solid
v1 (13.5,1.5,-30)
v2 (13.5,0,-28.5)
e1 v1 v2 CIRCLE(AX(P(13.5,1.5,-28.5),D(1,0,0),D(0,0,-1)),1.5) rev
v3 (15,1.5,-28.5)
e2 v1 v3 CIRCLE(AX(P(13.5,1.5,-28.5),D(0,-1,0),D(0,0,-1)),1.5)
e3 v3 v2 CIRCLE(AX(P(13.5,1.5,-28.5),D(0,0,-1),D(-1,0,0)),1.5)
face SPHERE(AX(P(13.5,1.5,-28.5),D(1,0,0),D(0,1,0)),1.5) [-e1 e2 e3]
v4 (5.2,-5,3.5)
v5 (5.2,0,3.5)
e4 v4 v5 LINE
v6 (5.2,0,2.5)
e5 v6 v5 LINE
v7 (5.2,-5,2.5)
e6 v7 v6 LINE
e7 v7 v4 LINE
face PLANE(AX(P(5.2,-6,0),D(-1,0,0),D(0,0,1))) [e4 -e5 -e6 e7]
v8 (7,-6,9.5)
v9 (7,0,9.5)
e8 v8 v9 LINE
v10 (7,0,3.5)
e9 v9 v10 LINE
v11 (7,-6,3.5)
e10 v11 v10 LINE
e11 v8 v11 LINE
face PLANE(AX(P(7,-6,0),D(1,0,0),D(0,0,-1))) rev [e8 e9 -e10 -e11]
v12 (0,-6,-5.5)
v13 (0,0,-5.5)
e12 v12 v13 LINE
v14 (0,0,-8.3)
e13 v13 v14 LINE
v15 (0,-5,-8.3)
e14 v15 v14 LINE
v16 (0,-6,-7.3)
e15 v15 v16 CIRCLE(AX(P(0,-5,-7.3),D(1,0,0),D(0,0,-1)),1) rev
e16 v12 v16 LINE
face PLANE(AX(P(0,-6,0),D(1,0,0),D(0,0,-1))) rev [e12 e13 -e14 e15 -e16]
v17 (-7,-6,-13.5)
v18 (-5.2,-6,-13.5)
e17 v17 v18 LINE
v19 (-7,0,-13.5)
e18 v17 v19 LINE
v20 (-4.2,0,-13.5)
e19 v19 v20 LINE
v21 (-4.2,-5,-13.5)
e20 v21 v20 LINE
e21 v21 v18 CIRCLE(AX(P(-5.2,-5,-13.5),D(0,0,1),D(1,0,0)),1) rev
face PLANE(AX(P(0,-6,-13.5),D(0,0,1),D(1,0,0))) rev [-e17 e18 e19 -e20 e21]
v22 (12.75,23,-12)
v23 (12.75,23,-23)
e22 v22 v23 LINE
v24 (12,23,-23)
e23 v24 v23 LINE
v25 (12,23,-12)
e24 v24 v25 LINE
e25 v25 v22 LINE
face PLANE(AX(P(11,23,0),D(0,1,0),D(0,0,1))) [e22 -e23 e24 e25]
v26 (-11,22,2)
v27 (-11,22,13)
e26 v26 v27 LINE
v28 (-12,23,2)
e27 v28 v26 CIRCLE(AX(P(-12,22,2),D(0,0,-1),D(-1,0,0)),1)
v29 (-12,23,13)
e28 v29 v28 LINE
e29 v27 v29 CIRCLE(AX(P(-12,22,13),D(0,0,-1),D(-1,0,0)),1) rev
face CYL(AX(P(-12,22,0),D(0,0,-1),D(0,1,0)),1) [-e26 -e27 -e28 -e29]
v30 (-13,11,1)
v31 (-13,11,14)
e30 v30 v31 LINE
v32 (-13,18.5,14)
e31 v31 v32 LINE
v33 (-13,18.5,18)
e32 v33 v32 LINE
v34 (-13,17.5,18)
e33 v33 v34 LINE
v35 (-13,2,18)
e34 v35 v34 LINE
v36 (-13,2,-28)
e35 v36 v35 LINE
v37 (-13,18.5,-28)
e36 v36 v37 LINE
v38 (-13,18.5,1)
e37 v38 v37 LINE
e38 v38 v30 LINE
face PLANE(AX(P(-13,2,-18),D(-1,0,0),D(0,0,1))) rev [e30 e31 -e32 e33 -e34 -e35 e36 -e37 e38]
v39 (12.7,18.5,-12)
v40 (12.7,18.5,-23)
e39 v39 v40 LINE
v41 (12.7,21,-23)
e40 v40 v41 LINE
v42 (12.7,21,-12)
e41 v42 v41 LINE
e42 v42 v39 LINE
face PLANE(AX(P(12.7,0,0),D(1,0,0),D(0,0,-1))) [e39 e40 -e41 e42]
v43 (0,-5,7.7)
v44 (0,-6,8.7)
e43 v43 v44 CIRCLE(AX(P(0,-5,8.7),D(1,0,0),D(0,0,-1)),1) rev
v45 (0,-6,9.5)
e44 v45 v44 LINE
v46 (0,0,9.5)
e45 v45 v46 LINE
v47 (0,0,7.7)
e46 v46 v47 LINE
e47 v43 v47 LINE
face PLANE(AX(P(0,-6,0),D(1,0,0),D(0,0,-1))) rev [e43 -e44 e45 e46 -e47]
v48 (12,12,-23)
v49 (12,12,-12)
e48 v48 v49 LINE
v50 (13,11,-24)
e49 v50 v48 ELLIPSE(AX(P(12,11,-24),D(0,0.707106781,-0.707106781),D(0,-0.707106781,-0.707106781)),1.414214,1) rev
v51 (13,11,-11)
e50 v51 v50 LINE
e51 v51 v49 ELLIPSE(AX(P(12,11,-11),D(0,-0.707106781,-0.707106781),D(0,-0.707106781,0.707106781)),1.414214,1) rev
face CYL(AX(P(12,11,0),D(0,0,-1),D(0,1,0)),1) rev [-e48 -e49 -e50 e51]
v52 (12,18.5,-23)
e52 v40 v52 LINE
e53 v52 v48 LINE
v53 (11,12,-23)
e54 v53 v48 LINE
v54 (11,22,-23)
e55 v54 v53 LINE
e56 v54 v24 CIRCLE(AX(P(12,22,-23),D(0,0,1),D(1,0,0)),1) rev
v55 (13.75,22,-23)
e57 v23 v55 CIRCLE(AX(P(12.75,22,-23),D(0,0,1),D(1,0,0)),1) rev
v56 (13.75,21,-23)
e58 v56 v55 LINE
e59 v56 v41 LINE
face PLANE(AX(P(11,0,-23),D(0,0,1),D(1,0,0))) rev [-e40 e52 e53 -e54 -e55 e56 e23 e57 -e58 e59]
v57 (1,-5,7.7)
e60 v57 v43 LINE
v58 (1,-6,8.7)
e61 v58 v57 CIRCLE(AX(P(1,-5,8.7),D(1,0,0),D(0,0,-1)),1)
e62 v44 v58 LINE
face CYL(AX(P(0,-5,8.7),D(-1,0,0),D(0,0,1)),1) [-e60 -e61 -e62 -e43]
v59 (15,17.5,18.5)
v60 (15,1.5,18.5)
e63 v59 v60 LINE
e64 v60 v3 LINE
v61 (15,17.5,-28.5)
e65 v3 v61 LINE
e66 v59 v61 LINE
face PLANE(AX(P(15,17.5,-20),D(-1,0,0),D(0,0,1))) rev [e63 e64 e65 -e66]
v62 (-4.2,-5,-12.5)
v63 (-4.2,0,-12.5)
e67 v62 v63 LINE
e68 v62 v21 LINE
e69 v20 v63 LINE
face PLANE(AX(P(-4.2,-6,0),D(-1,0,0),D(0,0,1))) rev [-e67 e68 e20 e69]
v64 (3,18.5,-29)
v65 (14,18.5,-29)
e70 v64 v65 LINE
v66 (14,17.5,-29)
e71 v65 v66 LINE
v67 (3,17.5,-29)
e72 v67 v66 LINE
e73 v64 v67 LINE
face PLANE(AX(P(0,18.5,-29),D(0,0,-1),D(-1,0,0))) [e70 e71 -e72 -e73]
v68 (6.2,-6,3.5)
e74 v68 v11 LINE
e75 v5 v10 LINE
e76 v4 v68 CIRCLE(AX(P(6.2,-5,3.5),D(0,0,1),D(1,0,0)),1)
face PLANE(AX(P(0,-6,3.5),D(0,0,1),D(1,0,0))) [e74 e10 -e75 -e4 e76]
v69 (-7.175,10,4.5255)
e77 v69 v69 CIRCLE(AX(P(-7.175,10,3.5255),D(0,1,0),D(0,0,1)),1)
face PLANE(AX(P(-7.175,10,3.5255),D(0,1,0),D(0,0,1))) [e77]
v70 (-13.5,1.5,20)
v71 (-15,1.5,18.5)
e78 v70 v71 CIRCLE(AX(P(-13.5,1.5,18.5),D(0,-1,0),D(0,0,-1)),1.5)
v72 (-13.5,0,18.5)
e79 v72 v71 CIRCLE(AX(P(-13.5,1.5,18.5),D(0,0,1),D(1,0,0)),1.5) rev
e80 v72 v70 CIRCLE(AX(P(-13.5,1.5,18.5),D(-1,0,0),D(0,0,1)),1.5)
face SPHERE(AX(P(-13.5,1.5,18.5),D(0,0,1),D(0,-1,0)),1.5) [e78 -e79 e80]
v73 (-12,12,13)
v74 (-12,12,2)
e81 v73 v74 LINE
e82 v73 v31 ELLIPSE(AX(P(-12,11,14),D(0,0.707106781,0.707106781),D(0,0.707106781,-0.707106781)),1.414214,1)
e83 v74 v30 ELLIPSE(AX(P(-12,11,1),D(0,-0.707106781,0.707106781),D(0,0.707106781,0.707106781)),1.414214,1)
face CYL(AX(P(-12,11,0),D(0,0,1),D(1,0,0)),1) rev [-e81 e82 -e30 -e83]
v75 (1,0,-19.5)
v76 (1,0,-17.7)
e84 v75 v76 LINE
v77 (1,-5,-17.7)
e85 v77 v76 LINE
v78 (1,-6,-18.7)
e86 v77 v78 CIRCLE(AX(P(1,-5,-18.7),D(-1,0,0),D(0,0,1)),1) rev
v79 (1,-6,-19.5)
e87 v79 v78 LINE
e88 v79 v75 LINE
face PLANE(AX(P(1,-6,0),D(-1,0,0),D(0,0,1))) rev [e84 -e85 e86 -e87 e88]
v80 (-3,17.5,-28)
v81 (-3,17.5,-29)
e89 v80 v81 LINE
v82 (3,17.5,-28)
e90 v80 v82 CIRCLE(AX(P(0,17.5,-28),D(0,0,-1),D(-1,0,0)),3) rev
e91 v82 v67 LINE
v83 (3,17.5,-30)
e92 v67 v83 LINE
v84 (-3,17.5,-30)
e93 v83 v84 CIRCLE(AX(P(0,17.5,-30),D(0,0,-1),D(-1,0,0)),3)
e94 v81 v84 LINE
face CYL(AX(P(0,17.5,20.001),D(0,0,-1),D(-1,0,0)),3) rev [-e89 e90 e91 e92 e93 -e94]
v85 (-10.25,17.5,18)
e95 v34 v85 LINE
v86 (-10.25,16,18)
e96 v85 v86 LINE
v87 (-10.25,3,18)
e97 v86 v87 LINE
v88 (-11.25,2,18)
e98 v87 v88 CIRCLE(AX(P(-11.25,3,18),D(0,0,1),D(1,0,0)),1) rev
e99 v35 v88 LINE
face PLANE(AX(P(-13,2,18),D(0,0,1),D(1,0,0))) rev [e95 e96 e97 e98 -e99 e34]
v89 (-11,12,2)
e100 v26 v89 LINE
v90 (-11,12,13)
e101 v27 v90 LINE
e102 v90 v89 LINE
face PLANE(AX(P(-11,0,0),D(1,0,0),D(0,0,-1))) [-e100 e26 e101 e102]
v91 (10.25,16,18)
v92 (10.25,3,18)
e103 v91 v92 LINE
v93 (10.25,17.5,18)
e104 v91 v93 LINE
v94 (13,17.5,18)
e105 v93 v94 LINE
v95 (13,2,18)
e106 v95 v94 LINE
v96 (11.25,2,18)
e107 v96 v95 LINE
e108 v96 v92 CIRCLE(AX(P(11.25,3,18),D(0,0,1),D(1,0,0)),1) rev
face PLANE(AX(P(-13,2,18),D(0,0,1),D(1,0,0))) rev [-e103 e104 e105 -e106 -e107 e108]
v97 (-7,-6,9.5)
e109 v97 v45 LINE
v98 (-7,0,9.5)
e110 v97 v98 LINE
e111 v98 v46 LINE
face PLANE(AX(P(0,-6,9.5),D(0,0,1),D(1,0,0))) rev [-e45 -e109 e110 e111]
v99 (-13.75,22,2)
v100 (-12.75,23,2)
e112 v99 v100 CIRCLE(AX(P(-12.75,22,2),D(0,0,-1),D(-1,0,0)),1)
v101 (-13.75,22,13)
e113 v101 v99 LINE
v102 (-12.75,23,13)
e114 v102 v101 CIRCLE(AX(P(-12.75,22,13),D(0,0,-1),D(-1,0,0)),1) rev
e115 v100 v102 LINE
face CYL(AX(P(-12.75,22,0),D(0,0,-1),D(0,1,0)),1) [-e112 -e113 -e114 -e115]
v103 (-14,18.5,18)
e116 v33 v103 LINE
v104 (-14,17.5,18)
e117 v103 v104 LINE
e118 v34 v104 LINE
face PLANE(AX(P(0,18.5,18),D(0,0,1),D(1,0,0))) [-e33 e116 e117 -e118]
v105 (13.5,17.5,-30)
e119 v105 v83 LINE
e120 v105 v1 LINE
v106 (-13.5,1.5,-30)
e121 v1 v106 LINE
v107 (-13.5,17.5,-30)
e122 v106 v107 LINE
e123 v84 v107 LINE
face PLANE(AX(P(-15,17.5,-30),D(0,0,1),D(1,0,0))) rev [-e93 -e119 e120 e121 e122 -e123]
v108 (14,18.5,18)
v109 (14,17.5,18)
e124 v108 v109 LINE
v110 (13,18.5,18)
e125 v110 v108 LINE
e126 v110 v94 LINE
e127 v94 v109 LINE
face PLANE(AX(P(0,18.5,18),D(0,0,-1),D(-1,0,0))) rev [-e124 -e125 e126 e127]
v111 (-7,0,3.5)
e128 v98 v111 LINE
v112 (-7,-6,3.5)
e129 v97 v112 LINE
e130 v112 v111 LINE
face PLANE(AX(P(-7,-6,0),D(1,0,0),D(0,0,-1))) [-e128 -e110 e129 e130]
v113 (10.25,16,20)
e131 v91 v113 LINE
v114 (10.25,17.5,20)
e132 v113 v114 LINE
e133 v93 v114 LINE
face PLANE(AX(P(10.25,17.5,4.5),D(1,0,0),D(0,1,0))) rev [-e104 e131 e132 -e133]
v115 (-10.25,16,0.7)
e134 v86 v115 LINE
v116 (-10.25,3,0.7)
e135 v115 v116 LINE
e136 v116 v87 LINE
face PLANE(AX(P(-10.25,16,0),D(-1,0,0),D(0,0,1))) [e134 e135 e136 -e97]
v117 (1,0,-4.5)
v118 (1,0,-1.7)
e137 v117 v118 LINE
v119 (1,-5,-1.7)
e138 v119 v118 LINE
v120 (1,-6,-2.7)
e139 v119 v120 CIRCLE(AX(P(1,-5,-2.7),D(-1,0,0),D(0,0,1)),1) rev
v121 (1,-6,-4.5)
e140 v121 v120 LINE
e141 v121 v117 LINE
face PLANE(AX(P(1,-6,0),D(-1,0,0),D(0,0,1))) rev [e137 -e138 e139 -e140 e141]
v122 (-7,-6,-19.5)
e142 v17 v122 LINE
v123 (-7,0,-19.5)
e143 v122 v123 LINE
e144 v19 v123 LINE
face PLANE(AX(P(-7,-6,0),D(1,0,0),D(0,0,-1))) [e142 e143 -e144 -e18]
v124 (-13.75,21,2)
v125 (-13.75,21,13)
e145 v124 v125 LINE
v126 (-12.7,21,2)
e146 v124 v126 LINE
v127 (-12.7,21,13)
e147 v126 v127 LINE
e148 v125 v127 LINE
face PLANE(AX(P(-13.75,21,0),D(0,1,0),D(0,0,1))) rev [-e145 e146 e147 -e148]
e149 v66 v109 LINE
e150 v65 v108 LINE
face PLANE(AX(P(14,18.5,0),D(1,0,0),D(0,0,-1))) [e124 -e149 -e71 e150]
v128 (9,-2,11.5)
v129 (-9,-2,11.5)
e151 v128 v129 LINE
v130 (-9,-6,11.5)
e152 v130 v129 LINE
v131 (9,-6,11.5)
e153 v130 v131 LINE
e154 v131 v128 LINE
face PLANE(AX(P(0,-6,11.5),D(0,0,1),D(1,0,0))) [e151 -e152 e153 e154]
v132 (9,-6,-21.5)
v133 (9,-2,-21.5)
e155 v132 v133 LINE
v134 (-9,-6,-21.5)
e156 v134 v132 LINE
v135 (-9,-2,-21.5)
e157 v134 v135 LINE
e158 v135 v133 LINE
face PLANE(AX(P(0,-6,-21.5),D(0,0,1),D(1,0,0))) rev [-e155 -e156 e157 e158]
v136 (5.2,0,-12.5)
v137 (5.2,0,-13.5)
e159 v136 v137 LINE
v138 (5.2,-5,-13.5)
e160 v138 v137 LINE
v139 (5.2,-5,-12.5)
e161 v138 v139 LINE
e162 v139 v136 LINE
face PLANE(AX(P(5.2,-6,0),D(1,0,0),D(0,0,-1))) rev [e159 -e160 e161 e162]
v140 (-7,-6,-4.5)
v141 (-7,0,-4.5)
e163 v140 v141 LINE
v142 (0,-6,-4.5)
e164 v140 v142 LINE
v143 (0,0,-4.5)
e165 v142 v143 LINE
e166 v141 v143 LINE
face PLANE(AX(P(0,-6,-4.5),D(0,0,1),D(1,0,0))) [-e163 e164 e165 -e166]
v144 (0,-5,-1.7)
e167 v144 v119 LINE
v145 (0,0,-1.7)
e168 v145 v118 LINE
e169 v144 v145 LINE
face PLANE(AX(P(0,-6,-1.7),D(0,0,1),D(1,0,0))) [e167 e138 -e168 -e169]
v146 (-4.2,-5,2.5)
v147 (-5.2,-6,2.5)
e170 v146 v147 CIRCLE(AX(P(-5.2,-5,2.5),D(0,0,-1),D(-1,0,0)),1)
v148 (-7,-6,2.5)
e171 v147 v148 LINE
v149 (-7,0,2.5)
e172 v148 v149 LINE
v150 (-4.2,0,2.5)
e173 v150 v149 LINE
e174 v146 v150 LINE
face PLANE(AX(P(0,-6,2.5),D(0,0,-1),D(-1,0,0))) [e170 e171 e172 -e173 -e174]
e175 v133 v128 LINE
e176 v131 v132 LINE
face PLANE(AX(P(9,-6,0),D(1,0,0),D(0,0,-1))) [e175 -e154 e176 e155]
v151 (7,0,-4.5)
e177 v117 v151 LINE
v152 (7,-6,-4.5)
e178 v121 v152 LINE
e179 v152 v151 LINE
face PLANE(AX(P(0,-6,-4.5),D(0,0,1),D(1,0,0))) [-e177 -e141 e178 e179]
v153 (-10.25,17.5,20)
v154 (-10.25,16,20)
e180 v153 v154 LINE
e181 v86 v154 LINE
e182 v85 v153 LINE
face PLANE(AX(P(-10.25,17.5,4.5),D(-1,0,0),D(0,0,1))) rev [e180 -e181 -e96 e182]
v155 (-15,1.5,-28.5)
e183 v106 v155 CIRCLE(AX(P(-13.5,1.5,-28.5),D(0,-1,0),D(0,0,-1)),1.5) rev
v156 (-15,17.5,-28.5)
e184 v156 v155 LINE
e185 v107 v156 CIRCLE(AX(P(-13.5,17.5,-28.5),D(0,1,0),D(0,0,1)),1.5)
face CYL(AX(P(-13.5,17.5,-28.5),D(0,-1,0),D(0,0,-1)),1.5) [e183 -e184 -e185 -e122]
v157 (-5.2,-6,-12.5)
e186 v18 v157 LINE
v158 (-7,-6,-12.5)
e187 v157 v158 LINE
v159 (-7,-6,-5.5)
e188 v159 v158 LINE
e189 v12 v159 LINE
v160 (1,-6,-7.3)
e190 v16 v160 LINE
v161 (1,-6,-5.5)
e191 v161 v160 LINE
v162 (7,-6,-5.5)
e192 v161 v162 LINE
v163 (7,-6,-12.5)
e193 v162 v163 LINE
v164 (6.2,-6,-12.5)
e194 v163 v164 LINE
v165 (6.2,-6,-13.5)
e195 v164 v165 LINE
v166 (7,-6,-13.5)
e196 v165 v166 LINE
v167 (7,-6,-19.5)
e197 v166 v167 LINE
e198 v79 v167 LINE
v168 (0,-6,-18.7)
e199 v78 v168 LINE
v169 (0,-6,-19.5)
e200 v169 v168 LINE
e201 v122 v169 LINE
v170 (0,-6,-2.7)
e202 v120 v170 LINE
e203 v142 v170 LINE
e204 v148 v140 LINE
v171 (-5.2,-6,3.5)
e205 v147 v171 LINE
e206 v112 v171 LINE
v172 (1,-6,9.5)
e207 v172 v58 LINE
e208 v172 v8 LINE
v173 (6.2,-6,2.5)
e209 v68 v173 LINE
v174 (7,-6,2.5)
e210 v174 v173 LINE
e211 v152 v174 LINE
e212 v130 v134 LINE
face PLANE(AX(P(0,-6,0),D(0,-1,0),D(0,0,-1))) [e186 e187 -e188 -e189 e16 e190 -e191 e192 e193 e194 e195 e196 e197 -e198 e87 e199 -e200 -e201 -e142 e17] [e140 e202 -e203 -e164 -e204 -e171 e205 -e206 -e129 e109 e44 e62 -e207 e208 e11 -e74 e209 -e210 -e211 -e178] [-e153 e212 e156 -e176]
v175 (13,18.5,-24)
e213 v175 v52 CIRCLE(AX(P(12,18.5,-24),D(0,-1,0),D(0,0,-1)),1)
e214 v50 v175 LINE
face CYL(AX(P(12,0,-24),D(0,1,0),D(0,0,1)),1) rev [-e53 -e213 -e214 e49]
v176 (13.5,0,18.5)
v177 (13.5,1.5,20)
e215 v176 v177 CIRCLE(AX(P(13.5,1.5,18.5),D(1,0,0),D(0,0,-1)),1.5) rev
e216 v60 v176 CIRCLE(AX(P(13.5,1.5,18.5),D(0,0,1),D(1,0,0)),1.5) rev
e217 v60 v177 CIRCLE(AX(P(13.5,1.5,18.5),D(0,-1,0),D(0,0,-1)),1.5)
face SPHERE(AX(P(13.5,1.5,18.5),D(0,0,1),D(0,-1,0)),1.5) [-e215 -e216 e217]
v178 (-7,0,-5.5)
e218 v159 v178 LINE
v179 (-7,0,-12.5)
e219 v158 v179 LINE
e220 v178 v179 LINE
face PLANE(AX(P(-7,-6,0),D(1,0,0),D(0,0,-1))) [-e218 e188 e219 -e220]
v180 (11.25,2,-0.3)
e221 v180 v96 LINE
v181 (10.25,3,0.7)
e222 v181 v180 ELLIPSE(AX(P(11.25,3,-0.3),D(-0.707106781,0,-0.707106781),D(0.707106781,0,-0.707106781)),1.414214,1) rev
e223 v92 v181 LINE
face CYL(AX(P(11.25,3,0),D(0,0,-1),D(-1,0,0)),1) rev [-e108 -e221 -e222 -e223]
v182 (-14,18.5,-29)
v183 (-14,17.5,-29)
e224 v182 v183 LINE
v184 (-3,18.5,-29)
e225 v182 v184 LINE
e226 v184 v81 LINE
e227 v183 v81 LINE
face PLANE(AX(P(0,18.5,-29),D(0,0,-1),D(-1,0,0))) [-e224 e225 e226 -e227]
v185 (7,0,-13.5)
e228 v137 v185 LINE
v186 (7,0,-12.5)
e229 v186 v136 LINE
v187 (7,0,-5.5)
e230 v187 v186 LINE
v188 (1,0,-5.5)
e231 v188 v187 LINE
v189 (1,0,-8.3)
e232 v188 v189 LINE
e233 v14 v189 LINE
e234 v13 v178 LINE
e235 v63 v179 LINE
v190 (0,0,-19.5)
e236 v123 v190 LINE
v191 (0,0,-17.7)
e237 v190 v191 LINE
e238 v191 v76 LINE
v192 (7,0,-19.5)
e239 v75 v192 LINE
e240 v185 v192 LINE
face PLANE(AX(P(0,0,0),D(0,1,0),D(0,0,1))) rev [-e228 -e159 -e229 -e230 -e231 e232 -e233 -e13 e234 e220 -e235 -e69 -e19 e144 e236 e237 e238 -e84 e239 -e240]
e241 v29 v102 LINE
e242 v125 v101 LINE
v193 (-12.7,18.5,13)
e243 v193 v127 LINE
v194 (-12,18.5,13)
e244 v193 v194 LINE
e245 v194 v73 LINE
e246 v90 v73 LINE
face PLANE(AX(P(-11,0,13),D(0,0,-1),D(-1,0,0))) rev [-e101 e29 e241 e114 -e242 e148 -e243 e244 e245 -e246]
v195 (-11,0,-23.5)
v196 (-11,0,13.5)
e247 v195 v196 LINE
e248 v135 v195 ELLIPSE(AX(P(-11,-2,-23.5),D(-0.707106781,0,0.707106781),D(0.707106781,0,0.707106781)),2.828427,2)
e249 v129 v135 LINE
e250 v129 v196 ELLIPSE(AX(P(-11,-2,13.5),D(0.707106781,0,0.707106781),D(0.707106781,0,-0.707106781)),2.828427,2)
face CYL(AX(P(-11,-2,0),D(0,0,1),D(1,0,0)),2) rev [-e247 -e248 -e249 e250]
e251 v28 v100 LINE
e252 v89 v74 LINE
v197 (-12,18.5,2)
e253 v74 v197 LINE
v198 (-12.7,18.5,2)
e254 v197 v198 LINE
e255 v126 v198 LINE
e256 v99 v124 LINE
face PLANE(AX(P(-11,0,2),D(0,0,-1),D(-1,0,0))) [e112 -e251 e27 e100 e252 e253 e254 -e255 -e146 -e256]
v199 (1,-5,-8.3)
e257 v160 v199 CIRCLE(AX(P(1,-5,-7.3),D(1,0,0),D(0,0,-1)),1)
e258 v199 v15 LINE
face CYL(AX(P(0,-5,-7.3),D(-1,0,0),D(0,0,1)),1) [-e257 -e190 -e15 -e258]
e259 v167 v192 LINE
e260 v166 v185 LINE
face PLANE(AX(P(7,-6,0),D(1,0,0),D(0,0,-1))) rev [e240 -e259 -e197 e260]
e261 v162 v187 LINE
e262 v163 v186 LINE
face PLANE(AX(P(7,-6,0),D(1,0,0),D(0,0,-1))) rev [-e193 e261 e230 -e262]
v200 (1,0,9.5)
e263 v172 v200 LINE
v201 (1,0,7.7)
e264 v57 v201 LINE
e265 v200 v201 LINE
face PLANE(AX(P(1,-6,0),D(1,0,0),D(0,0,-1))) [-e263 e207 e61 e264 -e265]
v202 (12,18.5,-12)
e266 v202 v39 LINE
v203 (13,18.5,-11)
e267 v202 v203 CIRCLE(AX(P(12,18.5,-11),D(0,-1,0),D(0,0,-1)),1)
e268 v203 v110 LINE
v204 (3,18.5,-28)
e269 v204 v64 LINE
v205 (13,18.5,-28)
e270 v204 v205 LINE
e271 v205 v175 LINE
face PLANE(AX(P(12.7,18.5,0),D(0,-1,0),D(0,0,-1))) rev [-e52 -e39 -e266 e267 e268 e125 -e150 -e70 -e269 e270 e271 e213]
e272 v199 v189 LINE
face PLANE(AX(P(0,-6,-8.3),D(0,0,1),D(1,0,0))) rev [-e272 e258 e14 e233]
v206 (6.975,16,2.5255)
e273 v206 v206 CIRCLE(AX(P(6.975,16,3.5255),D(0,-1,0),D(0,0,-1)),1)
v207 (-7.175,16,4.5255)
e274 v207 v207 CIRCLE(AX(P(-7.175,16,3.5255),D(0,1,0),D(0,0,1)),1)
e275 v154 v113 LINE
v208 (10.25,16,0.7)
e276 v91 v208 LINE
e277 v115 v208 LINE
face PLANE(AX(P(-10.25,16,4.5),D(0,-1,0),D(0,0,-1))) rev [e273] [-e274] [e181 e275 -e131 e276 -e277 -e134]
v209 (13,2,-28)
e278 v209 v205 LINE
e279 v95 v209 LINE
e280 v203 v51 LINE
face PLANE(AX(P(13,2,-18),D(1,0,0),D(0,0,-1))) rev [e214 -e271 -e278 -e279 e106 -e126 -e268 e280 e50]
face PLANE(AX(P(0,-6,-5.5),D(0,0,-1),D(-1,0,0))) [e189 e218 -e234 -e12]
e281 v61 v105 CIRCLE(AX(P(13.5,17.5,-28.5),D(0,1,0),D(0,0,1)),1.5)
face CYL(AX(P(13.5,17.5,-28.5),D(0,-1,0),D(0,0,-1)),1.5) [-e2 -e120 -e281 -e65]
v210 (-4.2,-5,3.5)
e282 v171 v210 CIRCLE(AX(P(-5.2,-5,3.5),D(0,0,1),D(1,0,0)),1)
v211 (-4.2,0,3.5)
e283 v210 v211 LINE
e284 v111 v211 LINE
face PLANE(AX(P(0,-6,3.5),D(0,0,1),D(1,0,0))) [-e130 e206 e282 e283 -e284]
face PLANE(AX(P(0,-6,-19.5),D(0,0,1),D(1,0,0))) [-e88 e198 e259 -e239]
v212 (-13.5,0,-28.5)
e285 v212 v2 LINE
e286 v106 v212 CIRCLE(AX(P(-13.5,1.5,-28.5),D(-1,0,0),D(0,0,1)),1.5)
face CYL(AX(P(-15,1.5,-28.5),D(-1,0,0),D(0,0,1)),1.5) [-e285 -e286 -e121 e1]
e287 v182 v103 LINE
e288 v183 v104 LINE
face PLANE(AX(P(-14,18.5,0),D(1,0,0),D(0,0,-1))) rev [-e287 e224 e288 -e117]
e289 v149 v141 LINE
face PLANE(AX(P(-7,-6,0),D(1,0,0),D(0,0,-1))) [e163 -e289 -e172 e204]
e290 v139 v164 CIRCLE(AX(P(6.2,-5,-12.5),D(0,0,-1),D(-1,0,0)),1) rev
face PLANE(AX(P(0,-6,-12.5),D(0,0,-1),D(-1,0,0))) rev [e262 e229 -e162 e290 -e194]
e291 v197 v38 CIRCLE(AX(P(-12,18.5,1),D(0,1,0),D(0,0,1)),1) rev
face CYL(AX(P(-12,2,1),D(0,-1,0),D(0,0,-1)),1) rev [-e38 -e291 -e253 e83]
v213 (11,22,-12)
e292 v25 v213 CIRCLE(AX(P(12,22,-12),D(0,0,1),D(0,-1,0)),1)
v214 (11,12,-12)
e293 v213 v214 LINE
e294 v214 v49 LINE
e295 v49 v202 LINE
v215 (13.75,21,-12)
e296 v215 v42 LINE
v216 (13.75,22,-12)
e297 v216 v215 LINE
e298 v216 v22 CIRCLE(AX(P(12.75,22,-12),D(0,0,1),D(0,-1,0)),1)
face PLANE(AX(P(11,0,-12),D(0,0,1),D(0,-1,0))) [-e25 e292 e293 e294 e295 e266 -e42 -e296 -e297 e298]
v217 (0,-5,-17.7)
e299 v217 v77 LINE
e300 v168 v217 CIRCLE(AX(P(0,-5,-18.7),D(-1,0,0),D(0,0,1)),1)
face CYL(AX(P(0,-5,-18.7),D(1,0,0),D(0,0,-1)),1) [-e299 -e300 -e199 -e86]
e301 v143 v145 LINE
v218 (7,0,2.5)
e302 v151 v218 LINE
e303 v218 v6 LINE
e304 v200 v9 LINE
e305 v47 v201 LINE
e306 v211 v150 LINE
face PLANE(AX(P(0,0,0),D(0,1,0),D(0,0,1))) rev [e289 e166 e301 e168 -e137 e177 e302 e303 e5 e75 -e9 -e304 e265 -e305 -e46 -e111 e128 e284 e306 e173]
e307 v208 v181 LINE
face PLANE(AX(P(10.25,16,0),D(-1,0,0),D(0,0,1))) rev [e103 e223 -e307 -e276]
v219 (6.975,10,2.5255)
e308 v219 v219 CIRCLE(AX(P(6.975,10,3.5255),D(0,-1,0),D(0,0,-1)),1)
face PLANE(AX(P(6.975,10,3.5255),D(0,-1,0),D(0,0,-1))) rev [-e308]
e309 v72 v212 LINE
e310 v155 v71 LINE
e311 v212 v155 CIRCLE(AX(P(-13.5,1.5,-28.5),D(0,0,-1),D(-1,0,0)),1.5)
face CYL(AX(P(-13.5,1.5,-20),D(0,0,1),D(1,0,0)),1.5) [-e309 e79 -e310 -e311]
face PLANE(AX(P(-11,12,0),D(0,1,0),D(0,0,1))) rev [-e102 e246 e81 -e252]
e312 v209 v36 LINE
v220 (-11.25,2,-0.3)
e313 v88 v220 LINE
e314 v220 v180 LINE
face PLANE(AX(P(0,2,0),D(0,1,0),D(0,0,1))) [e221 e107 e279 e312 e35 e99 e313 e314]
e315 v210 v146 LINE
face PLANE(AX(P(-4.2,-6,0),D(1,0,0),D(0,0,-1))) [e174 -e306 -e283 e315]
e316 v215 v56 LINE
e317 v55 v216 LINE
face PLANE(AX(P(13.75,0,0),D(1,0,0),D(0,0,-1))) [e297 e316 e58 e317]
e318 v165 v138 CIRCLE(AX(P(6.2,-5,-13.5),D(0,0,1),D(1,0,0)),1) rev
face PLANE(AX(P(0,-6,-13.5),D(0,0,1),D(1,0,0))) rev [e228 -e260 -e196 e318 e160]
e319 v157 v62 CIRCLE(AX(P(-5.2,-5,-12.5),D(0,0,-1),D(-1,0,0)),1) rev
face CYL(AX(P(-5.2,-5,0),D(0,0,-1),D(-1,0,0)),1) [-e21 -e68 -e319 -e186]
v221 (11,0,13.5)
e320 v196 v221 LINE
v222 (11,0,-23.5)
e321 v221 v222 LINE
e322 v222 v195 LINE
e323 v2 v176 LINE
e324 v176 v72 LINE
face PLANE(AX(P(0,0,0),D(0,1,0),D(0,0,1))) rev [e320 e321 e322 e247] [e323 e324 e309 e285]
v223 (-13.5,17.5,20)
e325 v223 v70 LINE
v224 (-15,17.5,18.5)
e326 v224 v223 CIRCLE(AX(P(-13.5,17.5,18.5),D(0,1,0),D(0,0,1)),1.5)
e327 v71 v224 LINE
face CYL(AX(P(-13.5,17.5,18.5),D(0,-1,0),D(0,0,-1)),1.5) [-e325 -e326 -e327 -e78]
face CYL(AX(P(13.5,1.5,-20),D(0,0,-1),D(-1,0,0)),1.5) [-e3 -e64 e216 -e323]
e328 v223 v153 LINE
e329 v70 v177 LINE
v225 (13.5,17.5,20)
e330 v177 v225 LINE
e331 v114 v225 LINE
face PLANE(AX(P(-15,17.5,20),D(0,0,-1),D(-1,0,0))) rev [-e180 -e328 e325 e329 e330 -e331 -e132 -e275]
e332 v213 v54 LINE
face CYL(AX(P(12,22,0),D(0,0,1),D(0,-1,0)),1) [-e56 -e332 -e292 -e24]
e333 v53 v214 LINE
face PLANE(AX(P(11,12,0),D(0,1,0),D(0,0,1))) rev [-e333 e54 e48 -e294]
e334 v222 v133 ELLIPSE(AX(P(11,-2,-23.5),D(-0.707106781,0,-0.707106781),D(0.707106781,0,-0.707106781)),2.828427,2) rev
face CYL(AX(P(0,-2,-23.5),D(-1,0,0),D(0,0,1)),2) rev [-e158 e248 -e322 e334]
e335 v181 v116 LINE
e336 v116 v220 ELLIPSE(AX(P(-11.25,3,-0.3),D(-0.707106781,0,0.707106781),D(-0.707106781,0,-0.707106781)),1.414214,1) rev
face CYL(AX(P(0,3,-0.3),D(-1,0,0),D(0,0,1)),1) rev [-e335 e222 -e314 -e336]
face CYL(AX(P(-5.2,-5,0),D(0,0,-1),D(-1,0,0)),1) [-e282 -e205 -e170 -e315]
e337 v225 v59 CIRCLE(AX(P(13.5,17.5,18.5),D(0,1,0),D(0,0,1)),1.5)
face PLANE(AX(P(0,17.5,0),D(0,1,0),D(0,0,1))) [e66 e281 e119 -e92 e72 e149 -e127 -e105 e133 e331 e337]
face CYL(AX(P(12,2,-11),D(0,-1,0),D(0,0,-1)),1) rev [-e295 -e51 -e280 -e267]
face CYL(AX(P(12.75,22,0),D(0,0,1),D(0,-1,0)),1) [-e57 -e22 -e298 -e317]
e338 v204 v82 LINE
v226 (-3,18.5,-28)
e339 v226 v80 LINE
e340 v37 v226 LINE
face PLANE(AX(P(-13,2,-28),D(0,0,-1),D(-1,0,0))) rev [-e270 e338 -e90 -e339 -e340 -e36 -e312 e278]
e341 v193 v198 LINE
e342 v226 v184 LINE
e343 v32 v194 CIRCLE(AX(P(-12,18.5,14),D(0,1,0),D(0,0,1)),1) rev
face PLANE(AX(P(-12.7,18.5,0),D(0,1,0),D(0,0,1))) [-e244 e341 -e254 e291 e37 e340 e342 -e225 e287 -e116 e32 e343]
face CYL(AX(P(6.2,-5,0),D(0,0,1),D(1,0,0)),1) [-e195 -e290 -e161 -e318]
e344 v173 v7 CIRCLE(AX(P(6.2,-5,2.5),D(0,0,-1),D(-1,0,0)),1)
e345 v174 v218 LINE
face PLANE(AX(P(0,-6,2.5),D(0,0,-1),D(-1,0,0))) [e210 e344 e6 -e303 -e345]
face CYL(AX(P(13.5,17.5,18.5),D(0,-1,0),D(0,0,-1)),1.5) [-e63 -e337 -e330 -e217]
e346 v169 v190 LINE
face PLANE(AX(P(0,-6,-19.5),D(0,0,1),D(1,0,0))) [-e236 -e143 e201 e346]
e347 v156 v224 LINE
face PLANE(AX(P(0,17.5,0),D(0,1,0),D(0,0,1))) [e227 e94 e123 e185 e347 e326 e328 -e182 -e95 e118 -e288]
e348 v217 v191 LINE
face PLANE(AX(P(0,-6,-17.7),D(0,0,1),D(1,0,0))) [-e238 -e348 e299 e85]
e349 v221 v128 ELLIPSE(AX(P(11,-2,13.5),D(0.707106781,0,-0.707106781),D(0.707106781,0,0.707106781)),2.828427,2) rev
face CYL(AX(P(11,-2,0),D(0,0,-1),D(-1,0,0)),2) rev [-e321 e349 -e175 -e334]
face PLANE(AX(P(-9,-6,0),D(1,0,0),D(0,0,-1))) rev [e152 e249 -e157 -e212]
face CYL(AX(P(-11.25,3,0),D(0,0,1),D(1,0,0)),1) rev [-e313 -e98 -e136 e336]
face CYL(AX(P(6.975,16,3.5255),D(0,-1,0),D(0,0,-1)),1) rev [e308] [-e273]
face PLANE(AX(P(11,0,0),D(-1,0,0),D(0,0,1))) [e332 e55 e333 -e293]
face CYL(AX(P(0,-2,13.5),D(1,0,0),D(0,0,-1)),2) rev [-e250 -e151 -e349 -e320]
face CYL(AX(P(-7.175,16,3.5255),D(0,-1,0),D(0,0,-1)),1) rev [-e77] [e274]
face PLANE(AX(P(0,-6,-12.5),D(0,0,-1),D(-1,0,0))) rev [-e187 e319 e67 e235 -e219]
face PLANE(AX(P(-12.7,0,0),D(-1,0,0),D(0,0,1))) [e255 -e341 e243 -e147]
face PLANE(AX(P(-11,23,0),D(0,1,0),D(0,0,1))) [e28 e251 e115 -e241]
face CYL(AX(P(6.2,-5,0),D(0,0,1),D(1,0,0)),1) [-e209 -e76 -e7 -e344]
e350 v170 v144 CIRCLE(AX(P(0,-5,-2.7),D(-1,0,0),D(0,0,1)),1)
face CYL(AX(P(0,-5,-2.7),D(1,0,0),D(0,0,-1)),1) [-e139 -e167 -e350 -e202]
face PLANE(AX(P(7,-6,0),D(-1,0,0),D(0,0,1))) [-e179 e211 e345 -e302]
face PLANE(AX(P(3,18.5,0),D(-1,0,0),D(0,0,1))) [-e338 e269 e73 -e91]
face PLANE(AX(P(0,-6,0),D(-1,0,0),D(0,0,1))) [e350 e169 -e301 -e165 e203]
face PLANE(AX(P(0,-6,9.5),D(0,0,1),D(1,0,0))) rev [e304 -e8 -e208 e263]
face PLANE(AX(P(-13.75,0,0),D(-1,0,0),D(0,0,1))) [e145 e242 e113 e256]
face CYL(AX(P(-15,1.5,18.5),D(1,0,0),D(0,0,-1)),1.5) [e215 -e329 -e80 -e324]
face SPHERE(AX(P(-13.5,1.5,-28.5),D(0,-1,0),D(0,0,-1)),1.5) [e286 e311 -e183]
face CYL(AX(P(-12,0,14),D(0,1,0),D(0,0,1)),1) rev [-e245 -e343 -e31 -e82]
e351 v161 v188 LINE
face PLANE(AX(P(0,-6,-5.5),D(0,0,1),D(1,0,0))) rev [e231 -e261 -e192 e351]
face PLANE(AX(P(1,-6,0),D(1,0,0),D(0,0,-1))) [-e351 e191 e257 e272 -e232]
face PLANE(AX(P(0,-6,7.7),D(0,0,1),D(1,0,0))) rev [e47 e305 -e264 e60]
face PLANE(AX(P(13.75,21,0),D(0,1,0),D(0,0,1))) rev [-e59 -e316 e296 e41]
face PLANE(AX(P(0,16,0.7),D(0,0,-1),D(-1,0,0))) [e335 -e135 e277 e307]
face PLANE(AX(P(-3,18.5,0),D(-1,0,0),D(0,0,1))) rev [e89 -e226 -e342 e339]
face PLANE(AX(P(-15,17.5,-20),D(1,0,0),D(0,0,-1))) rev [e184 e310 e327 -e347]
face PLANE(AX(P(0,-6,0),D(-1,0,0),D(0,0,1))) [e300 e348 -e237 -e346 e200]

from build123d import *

# Parameters (mm, degrees)
BOSS_EXTRUDE1_DEPTH  = 17.5
CUT_EXTRUDE1_DEPTH   = 15.5
SKETCH3_W            = 20.5
SKETCH3_H            = 1.5
CUT_EXTRUDE2_DEPTH   = 15.5
SKETCH5_W            = 20.5
SKETCH5_H            = 17.3
BOSS_EXTRUDE2_DEPTH  = 14
CUT_EXTRUDE4_START   = 8
SKETCH5_3_R          = 1
CUT_EXTRUDE4_DEPTH   = 6
FILLET3_R            = 1.5
SKETCH7_W            = 11
SKETCH7_H            = 5.5
BOSS_EXTRUDE7_DEPTH  = 2
SKETCH8_W            = 11
SKETCH8_H            = 2
BOSS_EXTRUDE8_DEPTH  = 0.75
SKETCH8_3_W          = 11
SKETCH8_3_H          = 2.5
CUT_EXTRUDE5_DEPTH   = 0.3
CUT_EXTRUDE7_REACH   = 59.044
SKETCH9_W            = 11
SKETCH9_H            = 5.5
BOSS_EXTRUDE12_DEPTH = 2
SKETCH10_W           = 11
SKETCH10_H           = 2
BOSS_EXTRUDE13_DEPTH = 0.75
SKETCH10_3_W         = 11
SKETCH10_3_H         = 2.5
CUT_EXTRUDE6_DEPTH   = 0.3
BOSS_EXTRUDE14_DEPTH = 1
FILLET4_R            = 1
SKETCH13_W           = 18
SKETCH13_H           = 33
BOSS_EXTRUDE15_DEPTH = 6
FILLET5_R            = 1
FILLET6_R            = 2
FILLET7_R            = 1


with BuildPart() as part:
    # Sketch1 → Boss-Extrude1 (new body)
    with BuildSketch(Plane(origin=(0, 0, 0), x_dir=(1, 0, 0), z_dir=(0, 1, 0))):
        Polygon((-15, 20), (-15, -20), (15, -20), (15, 20), (15, 30), (-15, 30), align=None)
    extrude(amount=BOSS_EXTRUDE1_DEPTH)

    # Sketch2 → Cut-Extrude1 (cut)
    with BuildSketch(Plane(origin=(0, 17.5, 0), x_dir=(1, 0, 0), z_dir=(0, 1, 0))):
        Polygon((-13, 18), (-13, -18), (13, -18), (13, 18), (13, 28), (-13, 28), align=None)
    extrude(amount=-CUT_EXTRUDE1_DEPTH, mode=Mode.SUBTRACT)

    # Sketch3 → Cut-Extrude2 (cut)
    with BuildSketch(Plane.XY.offset(20)):
        with Locations((0, 16.75)):
            Rectangle(SKETCH3_W, SKETCH3_H)
    extrude(amount=-CUT_EXTRUDE2_DEPTH, mode=Mode.SUBTRACT)

    # Sketch5 → Boss-Extrude2 (add)
    with BuildSketch(Plane(origin=(0, 2, 0), x_dir=(1, 0, 0), z_dir=(0, 1, 0))):
        with Locations((0, -9.35)):
            Rectangle(SKETCH5_W, SKETCH5_H)
    extrude(amount=BOSS_EXTRUDE2_DEPTH)

    # Sketch5<3> → Cut-Extrude4 (cut)
    with BuildSketch(Plane(origin=(0, 2, 0), x_dir=(1, 0, 0), z_dir=(0, 1, 0)).offset(CUT_EXTRUDE4_START)):
        with Locations(Location((6.975, -3.5255, 0), (0, 0, 90))):
            Circle(SKETCH5_3_R)
        with Locations(Location((-7.175, -3.5255, 0), (0, 0, 270))):
            Circle(SKETCH5_3_R)
    extrude(amount=CUT_EXTRUDE4_DEPTH, mode=Mode.SUBTRACT)

    # Fillet3
    fillet3_edges = [part.edges().sort_by_distance(p)[0] for p in [
        (15, 8.75, 20),
        (-15, 8.75, 20),
        (-15, 8.75, -30),
        (15, 8.75, -30),
        (0, 0, 20),
        (-15, 0, -5),
        (0, 0, -30),
        (15, 0, -5),
    ]]
    fillet(fillet3_edges, radius=FILLET3_R)

    # Sketch7 → Boss-Extrude7 (add)
    with BuildSketch(Plane(origin=(-13, 0, 0), x_dir=(0, 0, -1), z_dir=(1, 0, 0))):
        with Locations((-7.5, 14.75)):
            Rectangle(SKETCH7_W, SKETCH7_H)
        with Locations((-7.5, 20.25)):
            Rectangle(SKETCH7_W, SKETCH7_H)
    extrude(amount=BOSS_EXTRUDE7_DEPTH)

    # Sketch8 → Boss-Extrude8 (add)
    with BuildSketch(Plane.ZY.offset(13)):
        with Locations((7.5, 22)):
            Rectangle(SKETCH8_W, SKETCH8_H)
    extrude(amount=BOSS_EXTRUDE8_DEPTH)

    # Sketch8<3> → Cut-Extrude5 (cut)
    with BuildSketch(Plane.ZY.offset(13)):
        with Locations((7.5, 19.75)):
            Rectangle(SKETCH8_3_W, SKETCH8_3_H)
    extrude(amount=-CUT_EXTRUDE5_DEPTH, mode=Mode.SUBTRACT)

    # Sketch12 → Cut-Extrude7 (cut, up to next)
    with BuildSketch(Plane(origin=(0, 0, -30), x_dir=(-1, 0, 0), z_dir=(0, 0, -1)), mode=Mode.PRIVATE) as cut_extrude7_sk1:
        with BuildLine():
            Line((-3, 17.5), (3, 17.5))
            ThreePointArc((3, 17.5), (0, 14.5), (-3, 17.5))
        make_face()
    cut_extrude7_tool1 = extrude(cut_extrude7_sk1.sketch, amount=-CUT_EXTRUDE7_REACH, mode=Mode.PRIVATE) & part.part
    add(cut_extrude7_tool1.solids().sort_by_distance((0, 16.22676, -30))[0], mode=Mode.SUBTRACT)

    # Sketch9 → Boss-Extrude12 (add)
    with BuildSketch(Plane.ZY.offset(-13)):
        with Locations((-17.5, 14.75)):
            Rectangle(SKETCH9_W, SKETCH9_H)
        with Locations((-17.5, 20.25)):
            Rectangle(SKETCH9_W, SKETCH9_H)
    extrude(amount=BOSS_EXTRUDE12_DEPTH)

    # Sketch10 → Boss-Extrude13 (add)
    with BuildSketch(Plane(origin=(13, 0, 0), x_dir=(0, 0, -1), z_dir=(1, 0, 0))):
        with Locations((17.5, 22)):
            Rectangle(SKETCH10_W, SKETCH10_H)
    extrude(amount=BOSS_EXTRUDE13_DEPTH)

    # Sketch10<3> → Cut-Extrude6 (cut)
    with BuildSketch(Plane(origin=(13, 0, 0), x_dir=(0, 0, -1), z_dir=(1, 0, 0))):
        with Locations((17.5, 19.75)):
            Rectangle(SKETCH10_3_W, SKETCH10_3_H)
    extrude(amount=-CUT_EXTRUDE6_DEPTH, mode=Mode.SUBTRACT)

    # Sketch11 → Boss-Extrude14 (add)
    with BuildSketch(Plane(origin=(0, 17.5, 0), x_dir=(1, 0, 0), z_dir=(0, 1, 0))):
        Polygon((-14, -18), (-13, -18), (-13, 28), (-3, 28), (-3, 29), (-14, 29), align=None)
        Polygon((3, 28), (13, 28), (13, -18), (14, -18), (14, 29), (3, 29), align=None)
    extrude(amount=BOSS_EXTRUDE14_DEPTH)

    # Fillet4
    # the kernel refuses this fillet: 1 mm, written as the material it adds along each edge
    with BuildSketch(Plane(origin=(-13, 12, 13), x_dir=(1, 0, 0), z_dir=(0, 1, 0)), Plane(origin=(-13, 18.5, 2), x_dir=(1, 0, 0), z_dir=(0, -1, 0))) as fillet4_piece_1:
        with BuildLine():
            CenterArc((FILLET4_R, -FILLET4_R), FILLET4_R, 90, 90)
            Line((0, -FILLET4_R), (-FILLET4_R * 0.02, -FILLET4_R))
            Line((-FILLET4_R * 0.02, -FILLET4_R), (-FILLET4_R * 0.02, FILLET4_R * 0.02))
            Line((-FILLET4_R * 0.02, FILLET4_R * 0.02), (FILLET4_R, FILLET4_R * 0.02))
            Line((FILLET4_R, FILLET4_R * 0.02), (FILLET4_R, 0))
        make_face()
    extrude(amount=6.5)
    with BuildSketch(Plane(origin=(-13, 12, 13), x_dir=(1, 0, 0), z_dir=(0, 0, -1))) as fillet4_piece_2:
        with BuildLine():
            CenterArc((FILLET4_R, FILLET4_R), FILLET4_R, 180, 90)
            Line((0, FILLET4_R), (-FILLET4_R * 0.02, FILLET4_R))
            Line((-FILLET4_R * 0.02, FILLET4_R), (-FILLET4_R * 0.02, -FILLET4_R * 0.02))
            Line((-FILLET4_R * 0.02, -FILLET4_R * 0.02), (FILLET4_R, -FILLET4_R * 0.02))
            Line((FILLET4_R, -FILLET4_R * 0.02), (FILLET4_R, 0))
        make_face()
    extrude(amount=11)
    with BuildSketch(Plane(origin=(13, 12, -23), x_dir=(0, 0, -1), z_dir=(0, 1, 0)), Plane(origin=(13, 18.5, -12), x_dir=(0, 0, 1), z_dir=(0, -1, 0))) as fillet4_piece_3:
        with BuildLine():
            CenterArc((FILLET4_R, FILLET4_R), FILLET4_R, 180, 90)
            Line((0, FILLET4_R), (-FILLET4_R * 0.02, FILLET4_R))
            Line((-FILLET4_R * 0.02, FILLET4_R), (-FILLET4_R * 0.02, -FILLET4_R * 0.02))
            Line((-FILLET4_R * 0.02, -FILLET4_R * 0.02), (FILLET4_R, -FILLET4_R * 0.02))
            Line((FILLET4_R, -FILLET4_R * 0.02), (FILLET4_R, 0))
        make_face()
    extrude(amount=6.5)
    with BuildSketch(Plane(origin=(13, 12, -23), x_dir=(0, -1, 0), z_dir=(0, 0, 1))) as fillet4_piece_4:
        with BuildLine():
            CenterArc((FILLET4_R, -FILLET4_R), FILLET4_R, 90, 90)
            Line((0, -FILLET4_R), (-FILLET4_R * 0.02, -FILLET4_R))
            Line((-FILLET4_R * 0.02, -FILLET4_R), (-FILLET4_R * 0.02, FILLET4_R * 0.02))
            Line((-FILLET4_R * 0.02, FILLET4_R * 0.02), (FILLET4_R, FILLET4_R * 0.02))
            Line((FILLET4_R, FILLET4_R * 0.02), (FILLET4_R, 0))
        make_face()
    extrude(amount=11)
    with BuildSketch(Plane(origin=(-13, 12, 15.5), x_dir=(1, 0, 0), z_dir=(0, 0, -1))) as fillet4_piece_5a_section:
        with BuildLine():
            CenterArc((FILLET4_R, FILLET4_R), FILLET4_R, 180, 90)
            Line((0, FILLET4_R), (-FILLET4_R * 0.02, FILLET4_R))
            Line((-FILLET4_R * 0.02, FILLET4_R), (-FILLET4_R * 0.02, -FILLET4_R * 0.02))
            Line((-FILLET4_R * 0.02, -FILLET4_R * 0.02), (FILLET4_R, -FILLET4_R * 0.02))
            Line((FILLET4_R, -FILLET4_R * 0.02), (FILLET4_R, 0))
        make_face()
    fillet4_piece_5a = extrude(amount=13.5, mode=Mode.PRIVATE)
    fillet4_piece_5a = split(fillet4_piece_5a, bisect_by=Plane(origin=(-12.773604886, 11.773604886, 13), z_dir=(0, 0, 1)), keep=Keep.TOP, mode=Mode.PRIVATE)
    with BuildSketch(Plane(origin=(-13, 9.5, 13), x_dir=(1, 0, 0), z_dir=(0, 1, 0))) as fillet4_piece_5b_section:
        with BuildLine():
            CenterArc((FILLET4_R, -FILLET4_R), FILLET4_R, 90, 90)
            Line((0, -FILLET4_R), (-FILLET4_R * 0.02, -FILLET4_R))
            Line((-FILLET4_R * 0.02, -FILLET4_R), (-FILLET4_R * 0.02, FILLET4_R * 0.02))
            Line((-FILLET4_R * 0.02, FILLET4_R * 0.02), (FILLET4_R, FILLET4_R * 0.02))
            Line((FILLET4_R, FILLET4_R * 0.02), (FILLET4_R, 0))
        make_face()
    fillet4_piece_5b = extrude(amount=9, mode=Mode.PRIVATE)
    fillet4_piece_5b = split(fillet4_piece_5b, bisect_by=Plane(origin=(-12.773604886, 12, 13.226395114), z_dir=(0, -1, 0)), keep=Keep.TOP, mode=Mode.PRIVATE)
    fillet4_piece_5 = fillet4_piece_5a & fillet4_piece_5b
    add(fillet4_piece_5)
    with BuildSketch(Plane(origin=(-13, 18.5, 2), x_dir=(1, 0, 0), z_dir=(0, -1, 0))) as fillet4_piece_6a_section:
        with BuildLine():
            CenterArc((FILLET4_R, -FILLET4_R), FILLET4_R, 90, 90)
            Line((0, -FILLET4_R), (-FILLET4_R * 0.02, -FILLET4_R))
            Line((-FILLET4_R * 0.02, -FILLET4_R), (-FILLET4_R * 0.02, FILLET4_R * 0.02))
            Line((-FILLET4_R * 0.02, FILLET4_R * 0.02), (FILLET4_R, FILLET4_R * 0.02))
            Line((FILLET4_R, FILLET4_R * 0.02), (FILLET4_R, 0))
        make_face()
    fillet4_piece_6a = extrude(amount=9, mode=Mode.PRIVATE)
    fillet4_piece_6a = split(fillet4_piece_6a, bisect_by=Plane(origin=(-12.773604886, 12, 1.773604886), z_dir=(0, -1, 0)), keep=Keep.TOP, mode=Mode.PRIVATE)
    with BuildSketch(Plane(origin=(-13, 12, 13), x_dir=(1, 0, 0), z_dir=(0, 0, -1))) as fillet4_piece_6b_section:
        with BuildLine():
            CenterArc((FILLET4_R, FILLET4_R), FILLET4_R, 180, 90)
            Line((0, FILLET4_R), (-FILLET4_R * 0.02, FILLET4_R))
            Line((-FILLET4_R * 0.02, FILLET4_R), (-FILLET4_R * 0.02, -FILLET4_R * 0.02))
            Line((-FILLET4_R * 0.02, -FILLET4_R * 0.02), (FILLET4_R, -FILLET4_R * 0.02))
            Line((FILLET4_R, -FILLET4_R * 0.02), (FILLET4_R, 0))
        make_face()
    fillet4_piece_6b = extrude(amount=13.5, mode=Mode.PRIVATE)
    fillet4_piece_6b = split(fillet4_piece_6b, bisect_by=Plane(origin=(-12.773604886, 11.773604886, 2), z_dir=(0, 0, -1)), keep=Keep.TOP, mode=Mode.PRIVATE)
    fillet4_piece_6 = fillet4_piece_6a & fillet4_piece_6b
    add(fillet4_piece_6)
    with BuildSketch(Plane(origin=(13, 9.5, -23), x_dir=(0, 0, -1), z_dir=(0, 1, 0))) as fillet4_piece_7a_section:
        with BuildLine():
            CenterArc((FILLET4_R, FILLET4_R), FILLET4_R, 180, 90)
            Line((0, FILLET4_R), (-FILLET4_R * 0.02, FILLET4_R))
            Line((-FILLET4_R * 0.02, FILLET4_R), (-FILLET4_R * 0.02, -FILLET4_R * 0.02))
            Line((-FILLET4_R * 0.02, -FILLET4_R * 0.02), (FILLET4_R, -FILLET4_R * 0.02))
            Line((FILLET4_R, -FILLET4_R * 0.02), (FILLET4_R, 0))
        make_face()
    fillet4_piece_7a = extrude(amount=9, mode=Mode.PRIVATE)
    fillet4_piece_7a = split(fillet4_piece_7a, bisect_by=Plane(origin=(12.773604886, 12, -23.226395114), z_dir=(0, -1, 0)), keep=Keep.TOP, mode=Mode.PRIVATE)
    with BuildSketch(Plane(origin=(13, 12, -25.5), x_dir=(0, -1, 0), z_dir=(0, 0, 1))) as fillet4_piece_7b_section:
        with BuildLine():
            CenterArc((FILLET4_R, -FILLET4_R), FILLET4_R, 90, 90)
            Line((0, -FILLET4_R), (-FILLET4_R * 0.02, -FILLET4_R))
            Line((-FILLET4_R * 0.02, -FILLET4_R), (-FILLET4_R * 0.02, FILLET4_R * 0.02))
            Line((-FILLET4_R * 0.02, FILLET4_R * 0.02), (FILLET4_R, FILLET4_R * 0.02))
            Line((FILLET4_R, FILLET4_R * 0.02), (FILLET4_R, 0))
        make_face()
    fillet4_piece_7b = extrude(amount=13.5, mode=Mode.PRIVATE)
    fillet4_piece_7b = split(fillet4_piece_7b, bisect_by=Plane(origin=(12.773604886, 11.773604886, -23), z_dir=(0, 0, -1)), keep=Keep.TOP, mode=Mode.PRIVATE)
    fillet4_piece_7 = fillet4_piece_7a & fillet4_piece_7b
    add(fillet4_piece_7)
    with BuildSketch(Plane(origin=(13, 18.5, -12), x_dir=(0, 0, 1), z_dir=(0, -1, 0))) as fillet4_piece_8a_section:
        with BuildLine():
            CenterArc((FILLET4_R, FILLET4_R), FILLET4_R, 180, 90)
            Line((0, FILLET4_R), (-FILLET4_R * 0.02, FILLET4_R))
            Line((-FILLET4_R * 0.02, FILLET4_R), (-FILLET4_R * 0.02, -FILLET4_R * 0.02))
            Line((-FILLET4_R * 0.02, -FILLET4_R * 0.02), (FILLET4_R, -FILLET4_R * 0.02))
            Line((FILLET4_R, -FILLET4_R * 0.02), (FILLET4_R, 0))
        make_face()
    fillet4_piece_8a = extrude(amount=9, mode=Mode.PRIVATE)
    fillet4_piece_8a = split(fillet4_piece_8a, bisect_by=Plane(origin=(12.773604886, 12, -11.773604886), z_dir=(0, -1, 0)), keep=Keep.TOP, mode=Mode.PRIVATE)
    with BuildSketch(Plane(origin=(13, 12, -23), x_dir=(0, -1, 0), z_dir=(0, 0, 1))) as fillet4_piece_8b_section:
        with BuildLine():
            CenterArc((FILLET4_R, -FILLET4_R), FILLET4_R, 90, 90)
            Line((0, -FILLET4_R), (-FILLET4_R * 0.02, -FILLET4_R))
            Line((-FILLET4_R * 0.02, -FILLET4_R), (-FILLET4_R * 0.02, FILLET4_R * 0.02))
            Line((-FILLET4_R * 0.02, FILLET4_R * 0.02), (FILLET4_R, FILLET4_R * 0.02))
            Line((FILLET4_R, FILLET4_R * 0.02), (FILLET4_R, 0))
        make_face()
    fillet4_piece_8b = extrude(amount=13.5, mode=Mode.PRIVATE)
    fillet4_piece_8b = split(fillet4_piece_8b, bisect_by=Plane(origin=(12.773604886, 11.773604886, -12), z_dir=(0, 0, 1)), keep=Keep.TOP, mode=Mode.PRIVATE)
    fillet4_piece_8 = fillet4_piece_8a & fillet4_piece_8b
    add(fillet4_piece_8)
    # the kernel refuses this fillet: 1 mm, written as the material it takes off along each edge
    with BuildSketch(Plane(origin=(-11, 23, 2), x_dir=(0, -1, 0), z_dir=(0, 0, 1)), Plane(origin=(13.75, 23, -23), x_dir=(0, -1, 0), z_dir=(0, 0, 1))) as fillet4_2_piece_1:
        with BuildLine():
            CenterArc((FILLET4_R, -FILLET4_R), FILLET4_R, 90, 90)
            Line((0, -FILLET4_R), (-FILLET4_R * 0.02, -FILLET4_R))
            Line((-FILLET4_R * 0.02, -FILLET4_R), (-FILLET4_R * 0.02, FILLET4_R * 0.02))
            Line((-FILLET4_R * 0.02, FILLET4_R * 0.02), (FILLET4_R, FILLET4_R * 0.02))
            Line((FILLET4_R, FILLET4_R * 0.02), (FILLET4_R, 0))
        make_face()
    extrude(amount=11, mode=Mode.SUBTRACT)
    with BuildSketch(Plane(origin=(-13.75, 23, 13), x_dir=(1, 0, 0), z_dir=(0, 0, -1)), Plane(origin=(11, 23, -12), x_dir=(1, 0, 0), z_dir=(0, 0, -1))) as fillet4_2_piece_2:
        with BuildLine():
            CenterArc((FILLET4_R, FILLET4_R), FILLET4_R, 180, 90)
            Line((0, FILLET4_R), (-FILLET4_R * 0.02, FILLET4_R))
            Line((-FILLET4_R * 0.02, FILLET4_R), (-FILLET4_R * 0.02, -FILLET4_R * 0.02))
            Line((-FILLET4_R * 0.02, -FILLET4_R * 0.02), (FILLET4_R, -FILLET4_R * 0.02))
            Line((FILLET4_R, -FILLET4_R * 0.02), (FILLET4_R, 0))
        make_face()
    extrude(amount=11, mode=Mode.SUBTRACT)

    # Sketch13 → Boss-Extrude15 (add)
    with BuildSketch(Plane.XZ):
        with Locations((0, -5)):
            Rectangle(SKETCH13_W, SKETCH13_H)
        Polygon((0, -19.5), (-7, -19.5), (-7, -13.5), (-4.2, -13.5), (-4.2, -12.5), (-7, -12.5), (-7, -5.5), (0, -5.5), (0, -8.3), (1, -8.3), (1, -5.5), (7, -5.5), (7, -12.5), (5.2, -12.5), (5.2, -13.5), (7, -13.5), (7, -19.5), (1, -19.5), (1, -17.7), (0, -17.7), align=None, mode=Mode.SUBTRACT)
        Polygon((-7, 3.5), (-7, 9.5), (0, 9.5), (0, 7.7), (1, 7.7), (1, 9.5), (7, 9.5), (7, 3.5), (5.2, 3.5), (5.2, 2.5), (7, 2.5), (7, -4.5), (1, -4.5), (1, -1.7), (0, -1.7), (0, -4.5), (-7, -4.5), (-7, 2.5), (-4.2, 2.5), (-4.2, 3.5), align=None, mode=Mode.SUBTRACT)
    extrude(amount=BOSS_EXTRUDE15_DEPTH)

    # Fillet5
    fillet5_edges = [part.edges().sort_by_distance(p)[0] for p in [
        (5.2, -6, 3),
        (0.5, -6, -1.7),
        (-4.2, -6, 3),
        (0.5, -6, -17.7),
        (0.5, -6, -8.3),
        (5.2, -6, -13),
        (-4.2, -6, -13),
        (0.5, -6, 7.7),
    ]]
    fillet(fillet5_edges, radius=FILLET5_R)

    # Fillet6
    fillet6_edges = [part.edges().sort_by_distance(p)[0] for p in [
        (-9, 0, -5),
        (0, 0, -21.5),
        (9, 0, -5),
        (0, 0, 11.5),
    ]]
    fillet(fillet6_edges, radius=FILLET6_R)

    # Fillet7
    fillet7_edges = [part.edges().sort_by_distance(p)[0] for p in [
        (10.25, 2, 9.35),
        (-10.25, 2, 9.35),
        (0, 2, 0.7),
    ]]
    fillet(fillet7_edges, radius=FILLET7_R)


solid = part.part
